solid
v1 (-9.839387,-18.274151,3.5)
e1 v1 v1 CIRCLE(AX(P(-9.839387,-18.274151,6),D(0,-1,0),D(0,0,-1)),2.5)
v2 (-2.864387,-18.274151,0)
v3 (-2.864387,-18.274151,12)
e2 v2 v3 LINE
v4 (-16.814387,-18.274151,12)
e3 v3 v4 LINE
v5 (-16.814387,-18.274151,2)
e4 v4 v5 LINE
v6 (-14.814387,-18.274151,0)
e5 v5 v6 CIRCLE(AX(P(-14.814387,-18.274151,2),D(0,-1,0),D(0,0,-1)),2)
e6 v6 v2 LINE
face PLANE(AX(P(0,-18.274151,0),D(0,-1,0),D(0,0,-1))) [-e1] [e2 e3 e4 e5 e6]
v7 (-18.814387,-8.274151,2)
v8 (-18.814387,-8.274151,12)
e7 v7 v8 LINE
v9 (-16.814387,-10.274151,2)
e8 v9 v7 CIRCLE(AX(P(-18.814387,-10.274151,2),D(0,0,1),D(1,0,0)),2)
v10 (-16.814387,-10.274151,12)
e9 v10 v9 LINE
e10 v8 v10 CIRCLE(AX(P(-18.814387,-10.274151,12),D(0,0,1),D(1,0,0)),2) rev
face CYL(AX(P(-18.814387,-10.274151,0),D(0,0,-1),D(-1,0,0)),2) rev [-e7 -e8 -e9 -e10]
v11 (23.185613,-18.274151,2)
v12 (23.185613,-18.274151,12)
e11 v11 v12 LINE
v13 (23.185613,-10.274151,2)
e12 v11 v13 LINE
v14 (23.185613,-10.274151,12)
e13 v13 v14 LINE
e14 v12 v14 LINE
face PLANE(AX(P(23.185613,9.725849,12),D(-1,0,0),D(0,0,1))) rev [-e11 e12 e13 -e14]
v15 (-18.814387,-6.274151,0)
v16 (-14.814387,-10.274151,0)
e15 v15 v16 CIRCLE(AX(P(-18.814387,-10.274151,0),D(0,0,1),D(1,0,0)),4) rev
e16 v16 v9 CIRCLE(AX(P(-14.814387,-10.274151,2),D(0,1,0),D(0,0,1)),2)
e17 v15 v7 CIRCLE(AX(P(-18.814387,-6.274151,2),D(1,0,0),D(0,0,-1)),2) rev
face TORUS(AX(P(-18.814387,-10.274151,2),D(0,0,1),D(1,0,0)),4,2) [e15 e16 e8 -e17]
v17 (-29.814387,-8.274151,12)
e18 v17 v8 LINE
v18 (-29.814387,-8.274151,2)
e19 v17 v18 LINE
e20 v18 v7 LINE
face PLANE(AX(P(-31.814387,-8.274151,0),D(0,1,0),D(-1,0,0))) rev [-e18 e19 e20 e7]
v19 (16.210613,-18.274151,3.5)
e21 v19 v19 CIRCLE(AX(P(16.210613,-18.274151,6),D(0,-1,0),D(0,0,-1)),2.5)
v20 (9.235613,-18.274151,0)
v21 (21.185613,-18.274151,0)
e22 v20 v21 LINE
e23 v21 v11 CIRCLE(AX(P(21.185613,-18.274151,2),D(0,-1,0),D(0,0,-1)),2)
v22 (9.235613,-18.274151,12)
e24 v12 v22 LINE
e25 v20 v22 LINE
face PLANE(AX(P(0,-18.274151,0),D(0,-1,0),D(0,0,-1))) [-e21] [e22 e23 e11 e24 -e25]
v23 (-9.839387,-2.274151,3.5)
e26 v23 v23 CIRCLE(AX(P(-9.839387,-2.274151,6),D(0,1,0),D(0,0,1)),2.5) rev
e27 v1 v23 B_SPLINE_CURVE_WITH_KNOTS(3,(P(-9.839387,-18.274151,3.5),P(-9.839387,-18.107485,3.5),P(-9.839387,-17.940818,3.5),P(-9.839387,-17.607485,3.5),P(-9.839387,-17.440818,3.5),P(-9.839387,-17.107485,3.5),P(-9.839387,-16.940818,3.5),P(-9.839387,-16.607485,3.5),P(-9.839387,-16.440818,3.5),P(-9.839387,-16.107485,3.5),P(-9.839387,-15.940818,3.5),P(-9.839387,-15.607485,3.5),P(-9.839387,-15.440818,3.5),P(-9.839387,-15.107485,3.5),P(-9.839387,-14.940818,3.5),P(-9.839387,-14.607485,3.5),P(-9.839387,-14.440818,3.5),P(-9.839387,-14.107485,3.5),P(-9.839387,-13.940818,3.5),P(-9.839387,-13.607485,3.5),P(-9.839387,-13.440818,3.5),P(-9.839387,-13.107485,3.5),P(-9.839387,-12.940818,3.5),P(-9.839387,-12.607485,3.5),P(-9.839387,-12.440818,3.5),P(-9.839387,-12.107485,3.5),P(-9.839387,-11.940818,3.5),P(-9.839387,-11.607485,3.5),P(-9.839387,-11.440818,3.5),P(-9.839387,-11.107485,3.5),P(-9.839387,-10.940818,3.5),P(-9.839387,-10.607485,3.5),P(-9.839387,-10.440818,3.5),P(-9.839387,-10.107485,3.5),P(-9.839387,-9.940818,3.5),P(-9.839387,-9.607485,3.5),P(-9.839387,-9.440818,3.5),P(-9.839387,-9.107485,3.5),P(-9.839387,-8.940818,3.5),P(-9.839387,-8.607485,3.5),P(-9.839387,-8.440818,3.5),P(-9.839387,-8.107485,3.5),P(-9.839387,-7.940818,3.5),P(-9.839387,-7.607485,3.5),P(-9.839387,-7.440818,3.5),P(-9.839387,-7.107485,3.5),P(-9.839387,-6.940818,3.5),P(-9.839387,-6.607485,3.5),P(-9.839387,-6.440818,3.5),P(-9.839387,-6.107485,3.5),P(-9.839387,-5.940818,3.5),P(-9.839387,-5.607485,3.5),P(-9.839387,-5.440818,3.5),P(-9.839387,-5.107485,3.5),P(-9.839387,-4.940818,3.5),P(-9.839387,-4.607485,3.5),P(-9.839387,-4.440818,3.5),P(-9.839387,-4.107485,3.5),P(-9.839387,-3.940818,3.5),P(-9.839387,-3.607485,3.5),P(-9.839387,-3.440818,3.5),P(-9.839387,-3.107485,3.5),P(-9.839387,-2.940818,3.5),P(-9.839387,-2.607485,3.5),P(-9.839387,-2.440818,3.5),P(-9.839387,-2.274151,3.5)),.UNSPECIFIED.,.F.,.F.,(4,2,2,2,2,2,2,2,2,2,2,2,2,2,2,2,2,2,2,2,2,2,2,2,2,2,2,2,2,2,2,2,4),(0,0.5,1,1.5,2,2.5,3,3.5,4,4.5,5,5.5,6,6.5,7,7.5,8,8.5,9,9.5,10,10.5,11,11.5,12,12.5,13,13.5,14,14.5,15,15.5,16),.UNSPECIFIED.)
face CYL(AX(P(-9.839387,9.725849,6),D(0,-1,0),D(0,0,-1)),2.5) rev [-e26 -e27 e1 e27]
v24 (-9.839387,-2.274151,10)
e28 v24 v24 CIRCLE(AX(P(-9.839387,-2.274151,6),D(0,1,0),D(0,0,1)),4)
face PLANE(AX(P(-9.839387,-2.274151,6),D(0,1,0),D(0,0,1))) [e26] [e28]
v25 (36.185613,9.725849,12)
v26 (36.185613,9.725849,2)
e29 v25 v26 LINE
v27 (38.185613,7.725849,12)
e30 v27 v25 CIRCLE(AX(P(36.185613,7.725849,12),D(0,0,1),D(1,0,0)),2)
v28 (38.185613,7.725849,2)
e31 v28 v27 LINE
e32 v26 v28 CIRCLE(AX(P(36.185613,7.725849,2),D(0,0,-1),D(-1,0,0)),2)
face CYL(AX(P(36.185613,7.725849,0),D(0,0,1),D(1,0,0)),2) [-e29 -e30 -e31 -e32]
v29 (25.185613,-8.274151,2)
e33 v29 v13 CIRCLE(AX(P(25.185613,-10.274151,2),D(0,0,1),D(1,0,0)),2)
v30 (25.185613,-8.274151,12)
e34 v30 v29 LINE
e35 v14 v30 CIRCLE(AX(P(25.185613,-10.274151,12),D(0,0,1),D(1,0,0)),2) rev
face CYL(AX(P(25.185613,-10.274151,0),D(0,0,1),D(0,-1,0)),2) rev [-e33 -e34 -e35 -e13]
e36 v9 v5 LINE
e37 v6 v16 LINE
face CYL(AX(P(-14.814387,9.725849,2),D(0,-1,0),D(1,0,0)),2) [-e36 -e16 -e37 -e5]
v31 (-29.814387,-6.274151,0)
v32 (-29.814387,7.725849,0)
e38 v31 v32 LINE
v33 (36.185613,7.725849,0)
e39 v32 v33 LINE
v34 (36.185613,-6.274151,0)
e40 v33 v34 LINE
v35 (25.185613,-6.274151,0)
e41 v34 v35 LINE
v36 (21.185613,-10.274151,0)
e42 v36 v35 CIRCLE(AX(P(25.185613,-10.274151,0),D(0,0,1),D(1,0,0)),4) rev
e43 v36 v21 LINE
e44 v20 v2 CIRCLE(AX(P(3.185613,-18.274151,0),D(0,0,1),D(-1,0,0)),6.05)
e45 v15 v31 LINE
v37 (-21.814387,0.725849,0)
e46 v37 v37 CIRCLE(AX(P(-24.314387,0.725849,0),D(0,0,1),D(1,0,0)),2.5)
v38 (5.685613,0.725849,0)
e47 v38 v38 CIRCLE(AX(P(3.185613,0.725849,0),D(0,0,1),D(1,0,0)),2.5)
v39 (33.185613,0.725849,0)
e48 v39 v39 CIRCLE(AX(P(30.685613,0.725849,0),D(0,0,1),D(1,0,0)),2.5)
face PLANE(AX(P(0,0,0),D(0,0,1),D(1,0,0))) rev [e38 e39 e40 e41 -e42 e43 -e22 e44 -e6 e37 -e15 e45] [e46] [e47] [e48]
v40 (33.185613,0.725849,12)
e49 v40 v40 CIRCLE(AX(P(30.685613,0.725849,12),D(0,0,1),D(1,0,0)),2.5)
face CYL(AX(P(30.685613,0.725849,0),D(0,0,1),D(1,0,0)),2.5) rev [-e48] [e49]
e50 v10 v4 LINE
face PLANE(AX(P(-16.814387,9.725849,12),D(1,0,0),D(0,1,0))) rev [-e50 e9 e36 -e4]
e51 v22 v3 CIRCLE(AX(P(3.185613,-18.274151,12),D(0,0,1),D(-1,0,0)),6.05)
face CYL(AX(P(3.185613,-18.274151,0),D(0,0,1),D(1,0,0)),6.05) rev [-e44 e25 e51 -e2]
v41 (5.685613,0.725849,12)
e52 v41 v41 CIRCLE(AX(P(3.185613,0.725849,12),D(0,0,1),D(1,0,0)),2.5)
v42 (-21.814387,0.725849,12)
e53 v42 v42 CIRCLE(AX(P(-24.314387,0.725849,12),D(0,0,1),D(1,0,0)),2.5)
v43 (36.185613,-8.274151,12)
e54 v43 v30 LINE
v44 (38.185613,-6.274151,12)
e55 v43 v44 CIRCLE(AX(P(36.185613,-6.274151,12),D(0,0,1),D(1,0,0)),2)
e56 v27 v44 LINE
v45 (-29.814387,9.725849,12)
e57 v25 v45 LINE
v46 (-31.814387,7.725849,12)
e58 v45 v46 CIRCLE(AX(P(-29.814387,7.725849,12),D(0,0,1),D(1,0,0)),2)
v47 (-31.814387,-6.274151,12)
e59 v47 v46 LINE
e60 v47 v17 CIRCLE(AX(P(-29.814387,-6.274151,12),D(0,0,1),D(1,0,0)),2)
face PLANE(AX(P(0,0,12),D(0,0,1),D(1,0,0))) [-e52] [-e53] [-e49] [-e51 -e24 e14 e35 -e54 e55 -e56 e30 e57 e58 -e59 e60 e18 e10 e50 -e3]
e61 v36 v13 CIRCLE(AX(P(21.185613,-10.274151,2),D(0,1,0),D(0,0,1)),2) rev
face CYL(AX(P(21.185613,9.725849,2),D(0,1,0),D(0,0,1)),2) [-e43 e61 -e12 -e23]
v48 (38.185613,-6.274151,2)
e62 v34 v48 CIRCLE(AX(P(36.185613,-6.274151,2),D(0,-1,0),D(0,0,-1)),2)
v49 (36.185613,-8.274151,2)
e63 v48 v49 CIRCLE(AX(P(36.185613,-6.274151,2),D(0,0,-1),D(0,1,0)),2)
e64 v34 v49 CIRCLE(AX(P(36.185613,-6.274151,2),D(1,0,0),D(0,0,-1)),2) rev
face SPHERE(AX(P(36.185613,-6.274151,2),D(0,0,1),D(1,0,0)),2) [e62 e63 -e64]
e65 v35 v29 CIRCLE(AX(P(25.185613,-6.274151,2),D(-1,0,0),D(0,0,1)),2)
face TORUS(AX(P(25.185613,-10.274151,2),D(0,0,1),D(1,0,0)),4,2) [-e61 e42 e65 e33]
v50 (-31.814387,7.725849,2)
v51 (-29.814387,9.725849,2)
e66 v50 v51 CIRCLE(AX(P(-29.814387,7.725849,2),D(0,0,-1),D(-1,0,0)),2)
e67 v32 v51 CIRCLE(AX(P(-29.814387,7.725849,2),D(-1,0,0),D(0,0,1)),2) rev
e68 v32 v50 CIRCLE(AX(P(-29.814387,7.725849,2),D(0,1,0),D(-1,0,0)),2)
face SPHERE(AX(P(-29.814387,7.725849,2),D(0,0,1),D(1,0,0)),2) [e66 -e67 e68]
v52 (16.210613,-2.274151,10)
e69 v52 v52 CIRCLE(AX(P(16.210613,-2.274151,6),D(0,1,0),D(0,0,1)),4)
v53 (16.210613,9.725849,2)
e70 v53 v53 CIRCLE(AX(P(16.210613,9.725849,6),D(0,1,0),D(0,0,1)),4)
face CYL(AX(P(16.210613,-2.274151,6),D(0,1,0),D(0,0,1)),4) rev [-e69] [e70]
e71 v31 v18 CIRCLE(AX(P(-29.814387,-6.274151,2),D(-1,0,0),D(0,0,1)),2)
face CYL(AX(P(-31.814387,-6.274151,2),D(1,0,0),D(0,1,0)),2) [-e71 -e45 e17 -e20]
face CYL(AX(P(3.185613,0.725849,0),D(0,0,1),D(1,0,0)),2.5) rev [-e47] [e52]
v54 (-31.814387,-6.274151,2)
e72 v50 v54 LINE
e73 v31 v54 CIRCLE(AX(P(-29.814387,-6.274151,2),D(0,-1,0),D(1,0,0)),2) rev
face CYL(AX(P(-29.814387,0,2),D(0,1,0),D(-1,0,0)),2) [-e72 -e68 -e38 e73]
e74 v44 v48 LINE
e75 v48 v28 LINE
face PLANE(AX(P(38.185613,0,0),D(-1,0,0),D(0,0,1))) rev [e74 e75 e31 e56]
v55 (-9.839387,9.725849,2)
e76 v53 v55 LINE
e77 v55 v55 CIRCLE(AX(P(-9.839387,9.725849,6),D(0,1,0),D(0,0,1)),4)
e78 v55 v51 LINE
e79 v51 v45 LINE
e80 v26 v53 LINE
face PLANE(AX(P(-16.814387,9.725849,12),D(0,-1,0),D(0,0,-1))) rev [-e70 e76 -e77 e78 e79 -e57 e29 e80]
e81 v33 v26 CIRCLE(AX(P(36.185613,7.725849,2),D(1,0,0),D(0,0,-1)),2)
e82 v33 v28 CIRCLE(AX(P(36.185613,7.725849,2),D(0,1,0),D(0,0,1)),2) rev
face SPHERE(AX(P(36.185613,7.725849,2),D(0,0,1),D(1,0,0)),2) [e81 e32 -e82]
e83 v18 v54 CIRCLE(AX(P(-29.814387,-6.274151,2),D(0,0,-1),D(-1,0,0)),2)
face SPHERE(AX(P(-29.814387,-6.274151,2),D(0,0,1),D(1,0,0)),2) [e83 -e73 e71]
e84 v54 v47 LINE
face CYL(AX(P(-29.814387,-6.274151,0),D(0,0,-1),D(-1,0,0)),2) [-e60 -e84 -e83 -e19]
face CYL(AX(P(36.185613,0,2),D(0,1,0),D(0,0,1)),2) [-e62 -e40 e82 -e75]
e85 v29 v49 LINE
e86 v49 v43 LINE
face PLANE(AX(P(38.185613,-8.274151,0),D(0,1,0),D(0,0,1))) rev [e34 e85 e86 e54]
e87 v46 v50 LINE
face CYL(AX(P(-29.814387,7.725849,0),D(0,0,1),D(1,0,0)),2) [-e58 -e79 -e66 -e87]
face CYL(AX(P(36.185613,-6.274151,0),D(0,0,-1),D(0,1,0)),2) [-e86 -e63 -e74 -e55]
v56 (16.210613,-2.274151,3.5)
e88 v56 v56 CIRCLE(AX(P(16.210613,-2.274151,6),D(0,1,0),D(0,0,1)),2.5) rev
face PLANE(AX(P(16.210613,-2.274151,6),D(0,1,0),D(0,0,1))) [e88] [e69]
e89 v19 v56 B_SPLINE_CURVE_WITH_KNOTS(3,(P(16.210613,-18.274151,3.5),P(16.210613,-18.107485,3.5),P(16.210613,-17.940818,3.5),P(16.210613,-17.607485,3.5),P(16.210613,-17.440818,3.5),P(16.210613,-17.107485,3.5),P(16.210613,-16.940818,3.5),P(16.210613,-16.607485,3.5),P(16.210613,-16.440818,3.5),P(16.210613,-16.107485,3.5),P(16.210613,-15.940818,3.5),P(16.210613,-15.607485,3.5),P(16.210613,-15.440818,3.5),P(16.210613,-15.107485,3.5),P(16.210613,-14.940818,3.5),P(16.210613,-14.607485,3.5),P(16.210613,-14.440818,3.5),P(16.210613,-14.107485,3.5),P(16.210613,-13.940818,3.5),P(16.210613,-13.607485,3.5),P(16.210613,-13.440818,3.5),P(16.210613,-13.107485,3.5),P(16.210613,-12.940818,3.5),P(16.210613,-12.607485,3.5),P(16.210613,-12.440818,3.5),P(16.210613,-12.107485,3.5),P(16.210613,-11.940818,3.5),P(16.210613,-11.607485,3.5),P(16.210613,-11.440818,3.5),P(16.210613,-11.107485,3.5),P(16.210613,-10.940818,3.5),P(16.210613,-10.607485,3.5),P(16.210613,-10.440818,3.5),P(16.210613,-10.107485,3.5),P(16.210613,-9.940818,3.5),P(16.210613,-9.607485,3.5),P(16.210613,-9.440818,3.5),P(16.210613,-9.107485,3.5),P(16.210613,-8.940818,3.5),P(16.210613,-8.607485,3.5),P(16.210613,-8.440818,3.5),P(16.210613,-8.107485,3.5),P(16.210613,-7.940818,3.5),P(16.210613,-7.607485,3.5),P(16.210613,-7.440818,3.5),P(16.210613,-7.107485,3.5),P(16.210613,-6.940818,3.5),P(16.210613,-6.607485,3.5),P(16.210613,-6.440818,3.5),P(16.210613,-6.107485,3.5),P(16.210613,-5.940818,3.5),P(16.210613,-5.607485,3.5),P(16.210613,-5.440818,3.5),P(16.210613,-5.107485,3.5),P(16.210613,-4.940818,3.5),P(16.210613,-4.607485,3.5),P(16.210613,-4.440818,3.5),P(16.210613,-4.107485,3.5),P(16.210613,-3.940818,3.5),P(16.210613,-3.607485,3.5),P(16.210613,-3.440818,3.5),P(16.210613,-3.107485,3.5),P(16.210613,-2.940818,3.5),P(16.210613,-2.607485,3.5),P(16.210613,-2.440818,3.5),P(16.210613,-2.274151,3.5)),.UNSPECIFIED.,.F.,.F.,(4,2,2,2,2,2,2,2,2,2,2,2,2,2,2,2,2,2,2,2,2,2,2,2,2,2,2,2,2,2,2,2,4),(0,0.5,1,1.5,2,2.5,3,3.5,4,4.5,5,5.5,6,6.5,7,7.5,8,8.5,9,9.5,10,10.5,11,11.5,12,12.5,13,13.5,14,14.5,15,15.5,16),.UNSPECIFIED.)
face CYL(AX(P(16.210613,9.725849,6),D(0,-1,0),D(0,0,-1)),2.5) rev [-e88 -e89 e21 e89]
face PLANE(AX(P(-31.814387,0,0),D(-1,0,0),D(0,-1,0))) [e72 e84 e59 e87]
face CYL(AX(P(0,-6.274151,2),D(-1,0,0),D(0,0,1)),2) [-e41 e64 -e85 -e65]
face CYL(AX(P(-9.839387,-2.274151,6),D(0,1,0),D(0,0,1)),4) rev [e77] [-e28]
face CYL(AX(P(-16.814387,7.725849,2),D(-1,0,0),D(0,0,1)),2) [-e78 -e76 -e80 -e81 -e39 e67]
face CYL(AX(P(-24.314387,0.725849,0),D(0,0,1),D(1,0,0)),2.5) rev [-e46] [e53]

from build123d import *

# Parameters (mm, degrees)
ESQUISSE1_W             = 40
ESQUISSE1_H             = 18
BOSS_EXTRU_1_DEPTH      = 12
ESQUISSE2_W             = 40
ESQUISSE2_H             = 12
BOSS_EXTRU_2_DEPTH      = 10
ENL_V_MAT_EXTRU_1_DEPTH = 12
ESQUISSE4_R             = 2.5
ENL_V_MAT_EXTRU_2_DEPTH = 28
ESQUISSE5_R             = 2.5
ENL_V_MAT_EXTRU_3_DEPTH = 12
ESQUISSE6_R             = 4
ENL_V_MAT_EXTRU_5_DEPTH = 12
ESQUISSE7_W             = 12
ESQUISSE7_H             = 18
BOSS_EXTRU_3_DEPTH      = 15
ESQUISSE8_W             = 12
ESQUISSE8_H             = 18
BOSS_EXTRU_4_DEPTH      = 15
ESQUISSE9_R             = 2.5
ENL_V_MAT_EXTRU_6_DEPTH = 12
CONG_1_R                = 2


with BuildPart() as part:
    # Esquisse1 → Boss.-Extru.1 (new body)
    with BuildSketch(Plane.XY):
        with Locations((3.185612757, 0.725848564)):
            Rectangle(ESQUISSE1_W, ESQUISSE1_H)
    extrude(amount=BOSS_EXTRU_1_DEPTH)

    # Esquisse2 → Boss.-Extru.2 (add)
    with BuildSketch(Plane.XZ.offset(8.274151436)):
        with Locations((3.185612757, 6)):
            Rectangle(ESQUISSE2_W, ESQUISSE2_H)
    extrude(amount=BOSS_EXTRU_2_DEPTH)

    # Esquisse3 → Enlèv. mat.-Extru.1 (cut)
    with BuildSketch(Plane.XY.offset(12)):
        with BuildLine():
            Line((-2.864387243, -18.274151436), (9.235612757, -18.274151436))
            ThreePointArc((9.235612757, -18.274151436), (3.185612757, -12.224151436), (-2.864387243, -18.274151436))
        make_face()
    extrude(amount=-ENL_V_MAT_EXTRU_1_DEPTH, mode=Mode.SUBTRACT)

    # Esquisse4 → Enlèv. mat.-Extru.2 (cut)
    with BuildSketch(Plane.XZ.offset(18.274151436)):
        with Locations(Location((-9.839387243, 6, 0), (0, 0, 270))):
            Circle(ESQUISSE4_R)
        with Locations(Location((16.210612757, 6, 0), (0, 0, 270))):
            Circle(ESQUISSE4_R)
    extrude(amount=-ENL_V_MAT_EXTRU_2_DEPTH, mode=Mode.SUBTRACT)

    # Esquisse5 → Enlèv. mat.-Extru.3 (cut)
    with BuildSketch(Plane.XY.offset(12)):
        with Locations((3.185612757, 0.725848564)):
            Circle(ESQUISSE5_R)
    extrude(amount=-ENL_V_MAT_EXTRU_3_DEPTH, mode=Mode.SUBTRACT)

    # Esquisse6 → Enlèv. mat.-Extru.5 (cut)
    with BuildSketch(Plane(origin=(0, 9.725848564, 0), x_dir=(1, 0, 0), z_dir=(0, 1, 0))):
        with Locations(Location((16.210612757, -6, 0), (0, 0, 270))):
            Circle(ESQUISSE6_R)
        with Locations(Location((-9.839387243, -6, 0), (0, 0, 270))):
            Circle(ESQUISSE6_R)
    extrude(amount=-ENL_V_MAT_EXTRU_5_DEPTH, mode=Mode.SUBTRACT)

    # Esquisse7 → Boss.-Extru.3 (add)
    with BuildSketch(Plane.ZY.offset(16.814387243)):
        with Locations((6, 0.725848564)):
            Rectangle(ESQUISSE7_W, ESQUISSE7_H)
    extrude(amount=BOSS_EXTRU_3_DEPTH)

    # Esquisse8 → Boss.-Extru.4 (add)
    with BuildSketch(Plane(origin=(23.185612757, 0, 0), x_dir=(0, 0, -1), z_dir=(1, 0, 0))):
        with Locations((-6, 0.725848564)):
            Rectangle(ESQUISSE8_W, ESQUISSE8_H)
    extrude(amount=BOSS_EXTRU_4_DEPTH)

    # Esquisse9 → Enlèv. mat.-Extru.6 (cut)
    with BuildSketch(Plane.XY.offset(12)):
        with Locations((-24.314387243, 0.725848564)):
            Circle(ESQUISSE9_R)
        with Locations((30.685612757, 0.725848564)):
            Circle(ESQUISSE9_R)
    extrude(amount=-ENL_V_MAT_EXTRU_6_DEPTH, mode=Mode.SUBTRACT)

    # Congé1
    cong_1_edges = [part.edges().sort_by_distance(p)[0] for p in [
        (3.185612757, 9.725848564, 0),
        (23.185612757, -13.274151436, 0),
        (-16.814387243, -13.274151436, 0),
        (-16.814387243, -8.274151436, 6),
        (-24.314387243, -8.274151436, 0),
        (-31.814387243, 0.725848564, 0),
        (-31.814387243, -8.274151436, 6),
        (-31.814387243, 9.725848564, 6),
        (30.685612757, -8.274151436, 0),
        (23.185612757, -8.274151436, 6),
        (38.185612757, 0.725848564, 0),
        (38.185612757, 9.725848564, 6),
        (38.185612757, -8.274151436, 6),
    ]]
    fillet(cong_1_edges, radius=CONG_1_R - 0.0001)  # a hair under: the kernel refuses the full size


solid = part.part
